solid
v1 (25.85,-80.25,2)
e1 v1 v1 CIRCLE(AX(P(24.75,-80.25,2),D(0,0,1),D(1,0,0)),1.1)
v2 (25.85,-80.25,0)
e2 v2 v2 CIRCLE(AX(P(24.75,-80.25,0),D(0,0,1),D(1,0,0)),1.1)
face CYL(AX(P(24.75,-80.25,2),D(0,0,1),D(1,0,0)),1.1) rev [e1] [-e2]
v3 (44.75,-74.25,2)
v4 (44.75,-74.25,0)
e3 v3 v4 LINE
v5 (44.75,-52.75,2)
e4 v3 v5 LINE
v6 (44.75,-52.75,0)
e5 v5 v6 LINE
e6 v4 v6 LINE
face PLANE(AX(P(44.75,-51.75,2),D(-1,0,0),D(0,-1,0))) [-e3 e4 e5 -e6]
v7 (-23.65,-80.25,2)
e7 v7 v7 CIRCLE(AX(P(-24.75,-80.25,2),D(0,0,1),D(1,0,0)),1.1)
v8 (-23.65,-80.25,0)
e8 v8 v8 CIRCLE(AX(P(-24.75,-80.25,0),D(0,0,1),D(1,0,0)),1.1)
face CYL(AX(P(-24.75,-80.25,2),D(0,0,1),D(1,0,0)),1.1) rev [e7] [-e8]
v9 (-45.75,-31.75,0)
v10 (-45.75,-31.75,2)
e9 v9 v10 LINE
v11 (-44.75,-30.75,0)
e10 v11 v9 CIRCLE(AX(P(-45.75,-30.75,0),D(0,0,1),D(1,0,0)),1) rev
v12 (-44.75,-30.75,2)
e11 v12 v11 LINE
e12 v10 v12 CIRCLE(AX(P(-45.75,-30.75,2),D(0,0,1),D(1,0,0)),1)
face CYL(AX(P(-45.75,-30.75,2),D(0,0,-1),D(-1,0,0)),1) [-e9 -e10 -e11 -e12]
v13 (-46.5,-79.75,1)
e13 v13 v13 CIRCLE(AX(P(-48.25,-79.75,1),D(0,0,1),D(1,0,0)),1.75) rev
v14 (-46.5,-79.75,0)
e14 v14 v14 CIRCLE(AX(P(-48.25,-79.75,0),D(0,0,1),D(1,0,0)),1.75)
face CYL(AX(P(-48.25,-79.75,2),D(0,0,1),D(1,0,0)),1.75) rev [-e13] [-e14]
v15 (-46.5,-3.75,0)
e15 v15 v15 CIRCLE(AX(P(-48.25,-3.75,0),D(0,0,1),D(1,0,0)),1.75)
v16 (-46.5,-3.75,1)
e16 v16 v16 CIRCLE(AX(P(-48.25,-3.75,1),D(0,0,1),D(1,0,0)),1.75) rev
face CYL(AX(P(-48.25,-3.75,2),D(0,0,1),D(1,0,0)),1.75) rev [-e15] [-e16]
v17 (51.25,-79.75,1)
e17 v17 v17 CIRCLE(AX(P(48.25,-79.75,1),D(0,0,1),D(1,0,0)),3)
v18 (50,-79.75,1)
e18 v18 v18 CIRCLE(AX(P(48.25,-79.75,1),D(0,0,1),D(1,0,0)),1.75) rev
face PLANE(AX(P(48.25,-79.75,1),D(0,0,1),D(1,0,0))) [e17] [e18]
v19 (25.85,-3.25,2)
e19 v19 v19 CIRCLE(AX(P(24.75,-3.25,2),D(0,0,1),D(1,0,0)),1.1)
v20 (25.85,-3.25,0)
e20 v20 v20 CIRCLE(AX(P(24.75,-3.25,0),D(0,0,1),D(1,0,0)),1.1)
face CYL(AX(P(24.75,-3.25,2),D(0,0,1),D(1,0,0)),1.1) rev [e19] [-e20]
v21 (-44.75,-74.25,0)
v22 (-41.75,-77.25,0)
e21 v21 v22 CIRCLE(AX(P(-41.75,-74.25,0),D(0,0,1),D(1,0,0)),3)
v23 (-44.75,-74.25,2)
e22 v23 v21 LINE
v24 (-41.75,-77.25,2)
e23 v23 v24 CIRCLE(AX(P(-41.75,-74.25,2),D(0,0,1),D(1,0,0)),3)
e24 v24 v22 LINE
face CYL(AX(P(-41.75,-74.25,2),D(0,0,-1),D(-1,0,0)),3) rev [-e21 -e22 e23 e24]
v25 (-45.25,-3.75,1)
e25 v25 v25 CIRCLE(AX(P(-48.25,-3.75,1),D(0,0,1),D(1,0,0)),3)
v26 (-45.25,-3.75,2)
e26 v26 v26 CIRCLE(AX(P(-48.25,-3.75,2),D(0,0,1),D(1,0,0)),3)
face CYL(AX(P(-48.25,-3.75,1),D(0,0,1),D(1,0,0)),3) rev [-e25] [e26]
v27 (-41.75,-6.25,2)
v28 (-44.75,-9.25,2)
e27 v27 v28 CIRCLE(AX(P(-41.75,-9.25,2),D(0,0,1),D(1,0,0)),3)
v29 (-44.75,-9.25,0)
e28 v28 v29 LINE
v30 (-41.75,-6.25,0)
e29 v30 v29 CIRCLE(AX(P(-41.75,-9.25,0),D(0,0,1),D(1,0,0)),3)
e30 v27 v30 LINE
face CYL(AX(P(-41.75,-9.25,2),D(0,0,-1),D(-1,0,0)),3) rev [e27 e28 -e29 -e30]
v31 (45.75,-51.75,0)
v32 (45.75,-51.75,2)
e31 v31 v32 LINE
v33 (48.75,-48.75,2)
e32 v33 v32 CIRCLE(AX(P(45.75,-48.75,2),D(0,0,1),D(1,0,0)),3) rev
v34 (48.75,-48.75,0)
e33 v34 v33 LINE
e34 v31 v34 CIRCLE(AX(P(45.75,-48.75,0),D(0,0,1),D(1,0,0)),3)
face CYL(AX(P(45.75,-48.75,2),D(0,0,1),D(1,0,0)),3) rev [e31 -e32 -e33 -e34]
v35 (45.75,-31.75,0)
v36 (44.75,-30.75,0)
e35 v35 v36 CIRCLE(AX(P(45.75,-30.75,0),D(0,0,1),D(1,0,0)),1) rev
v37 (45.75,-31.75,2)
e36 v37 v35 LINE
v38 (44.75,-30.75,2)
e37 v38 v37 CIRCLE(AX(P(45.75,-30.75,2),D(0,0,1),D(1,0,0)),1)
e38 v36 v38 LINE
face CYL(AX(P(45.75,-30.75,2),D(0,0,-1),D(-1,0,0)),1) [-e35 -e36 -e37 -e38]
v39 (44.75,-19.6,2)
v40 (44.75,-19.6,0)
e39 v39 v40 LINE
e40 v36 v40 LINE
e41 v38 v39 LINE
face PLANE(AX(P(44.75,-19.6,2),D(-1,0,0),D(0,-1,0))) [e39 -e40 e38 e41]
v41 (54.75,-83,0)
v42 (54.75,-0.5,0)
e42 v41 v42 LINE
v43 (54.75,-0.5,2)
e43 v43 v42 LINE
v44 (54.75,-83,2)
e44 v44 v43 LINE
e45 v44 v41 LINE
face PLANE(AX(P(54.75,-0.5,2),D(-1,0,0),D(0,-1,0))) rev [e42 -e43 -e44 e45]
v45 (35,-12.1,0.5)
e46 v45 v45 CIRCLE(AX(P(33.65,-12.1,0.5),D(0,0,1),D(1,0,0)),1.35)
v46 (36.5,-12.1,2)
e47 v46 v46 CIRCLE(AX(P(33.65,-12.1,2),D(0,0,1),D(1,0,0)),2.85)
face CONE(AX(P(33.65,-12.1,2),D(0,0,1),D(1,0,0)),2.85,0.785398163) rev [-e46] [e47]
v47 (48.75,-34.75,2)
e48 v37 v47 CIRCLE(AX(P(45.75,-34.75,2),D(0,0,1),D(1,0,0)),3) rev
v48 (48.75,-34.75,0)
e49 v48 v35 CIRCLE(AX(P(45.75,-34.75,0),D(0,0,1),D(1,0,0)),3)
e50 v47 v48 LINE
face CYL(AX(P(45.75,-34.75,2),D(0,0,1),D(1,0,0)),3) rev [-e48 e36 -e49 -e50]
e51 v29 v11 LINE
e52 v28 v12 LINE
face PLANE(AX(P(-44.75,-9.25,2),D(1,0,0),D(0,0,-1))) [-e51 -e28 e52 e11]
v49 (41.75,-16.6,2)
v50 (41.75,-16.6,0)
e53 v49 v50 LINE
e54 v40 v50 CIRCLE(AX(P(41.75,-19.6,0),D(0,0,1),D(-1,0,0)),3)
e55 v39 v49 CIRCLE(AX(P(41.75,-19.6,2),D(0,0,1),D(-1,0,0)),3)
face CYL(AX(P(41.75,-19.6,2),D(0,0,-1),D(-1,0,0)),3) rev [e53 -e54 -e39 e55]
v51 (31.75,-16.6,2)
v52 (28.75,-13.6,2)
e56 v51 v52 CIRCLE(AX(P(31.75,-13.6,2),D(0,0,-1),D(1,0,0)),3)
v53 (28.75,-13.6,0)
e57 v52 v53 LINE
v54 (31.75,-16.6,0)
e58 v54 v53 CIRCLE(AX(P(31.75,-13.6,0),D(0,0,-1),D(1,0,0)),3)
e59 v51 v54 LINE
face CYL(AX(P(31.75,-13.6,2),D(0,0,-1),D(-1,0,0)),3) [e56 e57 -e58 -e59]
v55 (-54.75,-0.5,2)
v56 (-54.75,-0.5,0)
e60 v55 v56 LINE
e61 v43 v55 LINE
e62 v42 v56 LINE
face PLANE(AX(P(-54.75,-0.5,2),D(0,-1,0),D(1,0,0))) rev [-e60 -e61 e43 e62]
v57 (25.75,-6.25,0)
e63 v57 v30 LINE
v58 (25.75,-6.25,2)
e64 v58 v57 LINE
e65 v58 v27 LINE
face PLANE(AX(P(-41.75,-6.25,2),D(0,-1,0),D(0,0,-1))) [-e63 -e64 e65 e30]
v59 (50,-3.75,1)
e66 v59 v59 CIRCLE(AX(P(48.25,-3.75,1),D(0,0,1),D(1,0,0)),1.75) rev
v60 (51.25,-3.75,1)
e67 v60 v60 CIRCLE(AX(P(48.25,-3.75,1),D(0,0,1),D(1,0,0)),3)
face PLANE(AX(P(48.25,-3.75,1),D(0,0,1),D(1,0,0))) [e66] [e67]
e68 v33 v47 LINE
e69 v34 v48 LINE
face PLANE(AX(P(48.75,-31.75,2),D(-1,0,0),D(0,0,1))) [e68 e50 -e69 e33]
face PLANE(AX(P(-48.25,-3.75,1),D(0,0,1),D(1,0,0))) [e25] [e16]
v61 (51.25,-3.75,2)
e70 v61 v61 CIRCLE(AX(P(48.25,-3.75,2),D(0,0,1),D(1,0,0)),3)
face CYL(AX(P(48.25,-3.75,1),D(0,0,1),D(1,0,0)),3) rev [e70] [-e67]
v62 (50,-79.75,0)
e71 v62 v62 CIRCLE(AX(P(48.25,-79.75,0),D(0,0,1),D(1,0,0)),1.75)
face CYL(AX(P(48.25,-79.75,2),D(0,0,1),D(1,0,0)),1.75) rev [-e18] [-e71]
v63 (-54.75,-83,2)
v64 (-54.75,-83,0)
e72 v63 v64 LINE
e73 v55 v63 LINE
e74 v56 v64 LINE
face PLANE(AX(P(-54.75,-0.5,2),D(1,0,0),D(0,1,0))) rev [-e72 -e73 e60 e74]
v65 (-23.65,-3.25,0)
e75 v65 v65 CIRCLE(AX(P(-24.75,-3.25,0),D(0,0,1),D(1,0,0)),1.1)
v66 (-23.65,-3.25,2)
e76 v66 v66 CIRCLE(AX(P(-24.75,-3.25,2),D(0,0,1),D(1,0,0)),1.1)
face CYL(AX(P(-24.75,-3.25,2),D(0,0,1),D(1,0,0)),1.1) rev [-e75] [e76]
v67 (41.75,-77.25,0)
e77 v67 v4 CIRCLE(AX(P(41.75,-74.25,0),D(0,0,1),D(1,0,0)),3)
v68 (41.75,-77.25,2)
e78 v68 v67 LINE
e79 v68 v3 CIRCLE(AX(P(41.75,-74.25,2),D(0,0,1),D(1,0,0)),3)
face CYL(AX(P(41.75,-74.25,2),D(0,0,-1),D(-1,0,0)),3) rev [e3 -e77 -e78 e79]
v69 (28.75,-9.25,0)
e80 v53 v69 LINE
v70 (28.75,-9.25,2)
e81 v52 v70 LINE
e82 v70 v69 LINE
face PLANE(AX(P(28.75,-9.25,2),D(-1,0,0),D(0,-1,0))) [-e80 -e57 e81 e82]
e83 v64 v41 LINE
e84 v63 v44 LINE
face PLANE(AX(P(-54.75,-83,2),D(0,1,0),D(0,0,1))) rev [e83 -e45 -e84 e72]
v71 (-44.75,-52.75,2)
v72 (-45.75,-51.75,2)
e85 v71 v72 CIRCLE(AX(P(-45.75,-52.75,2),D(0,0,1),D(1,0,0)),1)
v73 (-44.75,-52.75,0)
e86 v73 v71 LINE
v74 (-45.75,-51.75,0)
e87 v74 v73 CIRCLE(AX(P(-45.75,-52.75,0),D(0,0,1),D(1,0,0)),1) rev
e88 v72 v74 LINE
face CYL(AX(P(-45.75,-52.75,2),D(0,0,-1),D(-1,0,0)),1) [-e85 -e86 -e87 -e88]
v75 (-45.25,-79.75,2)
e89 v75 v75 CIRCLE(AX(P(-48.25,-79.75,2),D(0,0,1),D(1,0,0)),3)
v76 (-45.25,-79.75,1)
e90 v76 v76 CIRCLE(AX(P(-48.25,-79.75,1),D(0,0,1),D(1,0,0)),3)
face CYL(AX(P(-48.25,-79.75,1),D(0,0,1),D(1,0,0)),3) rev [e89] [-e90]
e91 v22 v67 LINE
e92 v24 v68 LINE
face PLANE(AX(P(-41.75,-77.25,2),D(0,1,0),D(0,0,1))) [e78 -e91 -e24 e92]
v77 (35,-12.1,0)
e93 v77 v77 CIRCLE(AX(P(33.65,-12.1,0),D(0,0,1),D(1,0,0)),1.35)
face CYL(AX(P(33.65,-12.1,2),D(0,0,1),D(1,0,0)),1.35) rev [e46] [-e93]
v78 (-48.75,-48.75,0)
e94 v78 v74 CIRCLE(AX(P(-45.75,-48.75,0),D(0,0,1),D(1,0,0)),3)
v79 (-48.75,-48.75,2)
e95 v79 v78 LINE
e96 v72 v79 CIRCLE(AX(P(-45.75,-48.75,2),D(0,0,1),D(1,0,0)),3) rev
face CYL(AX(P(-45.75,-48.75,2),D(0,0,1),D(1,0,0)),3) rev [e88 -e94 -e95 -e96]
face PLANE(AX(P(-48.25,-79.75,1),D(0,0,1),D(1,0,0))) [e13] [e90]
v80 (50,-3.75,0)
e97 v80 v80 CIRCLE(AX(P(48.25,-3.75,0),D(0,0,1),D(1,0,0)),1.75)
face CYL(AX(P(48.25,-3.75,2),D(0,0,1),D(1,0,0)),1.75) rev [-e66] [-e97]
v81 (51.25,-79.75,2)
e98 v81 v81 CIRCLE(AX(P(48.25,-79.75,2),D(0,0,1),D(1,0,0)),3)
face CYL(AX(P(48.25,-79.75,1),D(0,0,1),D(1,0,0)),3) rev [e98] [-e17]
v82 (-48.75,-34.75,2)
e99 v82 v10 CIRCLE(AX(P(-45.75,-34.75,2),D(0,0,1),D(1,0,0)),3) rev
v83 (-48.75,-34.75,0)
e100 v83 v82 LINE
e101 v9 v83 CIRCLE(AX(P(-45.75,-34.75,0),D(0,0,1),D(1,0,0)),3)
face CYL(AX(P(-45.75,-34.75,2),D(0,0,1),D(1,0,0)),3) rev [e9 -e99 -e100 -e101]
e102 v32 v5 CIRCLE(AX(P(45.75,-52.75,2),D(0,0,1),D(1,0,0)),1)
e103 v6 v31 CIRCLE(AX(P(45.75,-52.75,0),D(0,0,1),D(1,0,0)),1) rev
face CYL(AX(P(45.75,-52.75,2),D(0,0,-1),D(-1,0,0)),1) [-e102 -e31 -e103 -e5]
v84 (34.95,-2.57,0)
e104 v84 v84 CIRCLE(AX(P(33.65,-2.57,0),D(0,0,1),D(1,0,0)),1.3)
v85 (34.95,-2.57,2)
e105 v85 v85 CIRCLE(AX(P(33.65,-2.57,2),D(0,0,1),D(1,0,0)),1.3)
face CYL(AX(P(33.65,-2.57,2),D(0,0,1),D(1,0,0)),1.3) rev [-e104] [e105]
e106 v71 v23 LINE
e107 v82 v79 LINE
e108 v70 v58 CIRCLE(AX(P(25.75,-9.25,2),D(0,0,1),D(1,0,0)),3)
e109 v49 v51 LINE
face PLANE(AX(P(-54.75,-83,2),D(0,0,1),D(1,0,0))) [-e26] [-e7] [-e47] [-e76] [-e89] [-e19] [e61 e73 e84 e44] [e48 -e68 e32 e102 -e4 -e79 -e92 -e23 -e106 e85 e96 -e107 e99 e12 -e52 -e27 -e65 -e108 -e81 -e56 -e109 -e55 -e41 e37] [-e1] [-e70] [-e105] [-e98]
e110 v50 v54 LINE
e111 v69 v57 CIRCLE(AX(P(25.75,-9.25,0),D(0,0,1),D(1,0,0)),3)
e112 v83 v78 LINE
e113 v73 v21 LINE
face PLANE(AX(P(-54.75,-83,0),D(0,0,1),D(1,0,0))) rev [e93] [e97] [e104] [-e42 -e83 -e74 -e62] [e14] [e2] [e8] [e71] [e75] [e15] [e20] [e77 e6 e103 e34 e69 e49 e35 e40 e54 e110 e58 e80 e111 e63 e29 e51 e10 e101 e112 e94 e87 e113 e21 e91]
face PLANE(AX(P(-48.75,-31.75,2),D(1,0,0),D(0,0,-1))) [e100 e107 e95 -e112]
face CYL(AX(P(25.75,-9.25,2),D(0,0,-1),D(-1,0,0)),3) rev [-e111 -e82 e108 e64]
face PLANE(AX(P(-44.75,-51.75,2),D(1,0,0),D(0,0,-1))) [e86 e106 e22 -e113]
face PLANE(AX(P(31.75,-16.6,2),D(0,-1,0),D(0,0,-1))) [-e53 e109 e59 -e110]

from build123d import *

# Parameters (mm, degrees)
SKETCH1_W                  = 109.5
SKETCH1_H                  = 82.5
BOSS_EXTRUDE1_DEPTH        = 2
F_3_5_3_5_DIAMETER_HOLE1_D = 3.5
F_2_6_2_6_DIAMETER_HOLE1_D = 2.6
SKETCH9_R                  = 3
CUT_EXTRUDE1_DEPTH         = 1
F_2_2_2_2_DIAMETER_HOLE1_D = 2.2
FILLET1_R                  = 1
FILLET2_R                  = 3


with BuildPart() as part:
    # Sketch1 → Boss-Extrude1 (new body)
    with BuildSketch(Plane.XY):
        with Locations((0, -41.75)):
            Rectangle(SKETCH1_W, SKETCH1_H)
        with BuildLine():
            Line((28.75, -9.25), (28.75, -13.6))
            ThreePointArc((28.75, -13.6), (29.628679656, -15.721320344), (31.75, -16.6))
            Line((31.75, -16.6), (41.75, -16.6))
            ThreePointArc((41.75, -16.6), (43.871320344, -17.478679656), (44.75, -19.6))
            Line((44.75, -19.6), (44.75, -31.75))
            Line((44.75, -31.75), (48.75, -31.75))
            Line((48.75, -31.75), (48.75, -41.75))
            Line((48.75, -41.75), (48.75, -51.75))
            Line((48.75, -51.75), (44.75, -51.75))
            Line((44.75, -51.75), (44.75, -74.25))
            ThreePointArc((44.75, -74.25), (43.871320344, -76.371320344), (41.75, -77.25))
            Line((41.75, -77.25), (-41.75, -77.25))
            ThreePointArc((-41.75, -77.25), (-43.871320344, -76.371320344), (-44.75, -74.25))
            Line((-44.75, -74.25), (-44.75, -51.75))
            Line((-44.75, -51.75), (-48.75, -51.75))
            Line((-48.75, -51.75), (-48.75, -31.75))
            Line((-48.75, -31.75), (-44.75, -31.75))
            Line((-44.75, -31.75), (-44.75, -9.25))
            ThreePointArc((-44.75, -9.25), (-43.871320344, -7.128679656), (-41.75, -6.25))
            Line((-41.75, -6.25), (25.75, -6.25))
            ThreePointArc((25.75, -6.25), (27.871320344, -7.128679656), (28.75, -9.25))
        make_face(mode=Mode.SUBTRACT)
    extrude(amount=BOSS_EXTRUDE1_DEPTH)

    # Ø3.5 (3.5) Diameter Hole1 (through all)
    with Locations(Plane.XY.offset(2)):
        with Locations((-48.25, -3.75), (-48.25, -79.75), (48.25, -79.75), (48.25, -3.75)):
            Hole(F_3_5_3_5_DIAMETER_HOLE1_D / 2)

    # Sketch5 → CSK for M2.5 Flat Countersunk Head Screw1 (revolve, cut)
    with BuildSketch(Plane(origin=(33.65, -12.1, 2), x_dir=(0, -1, 0), z_dir=(1, 0, 0))):
        Polygon((0, 0), (0, 2), (1.35, 2), (1.35, 1.5), (2.85, 0), align=None)
    revolve(axis=Axis((33.65, -12.1, 8.35), (0, 0, -1)), mode=Mode.SUBTRACT)

    # Ø2.6 (2.6) Diameter Hole1 (through all)
    with Locations(Plane.XY.offset(2)):
        with Locations((33.65, -2.57)):
            Hole(F_2_6_2_6_DIAMETER_HOLE1_D / 2)

    # Sketch9 → Cut-Extrude1 (cut)
    with BuildSketch(Plane.XY.offset(2)):
        with Locations((-48.25, -3.75)):
            Circle(SKETCH9_R)
        with Locations((48.25, -3.75)):
            Circle(SKETCH9_R)
        with Locations((48.25, -79.75)):
            Circle(SKETCH9_R)
        with Locations((-48.25, -79.75)):
            Circle(SKETCH9_R)
    extrude(amount=-CUT_EXTRUDE1_DEPTH, mode=Mode.SUBTRACT)

    # Ø2.2 (2.2) Diameter Hole1 (through all)
    with Locations(Plane.XY.offset(2)):
        with Locations((-24.75, -3.25), (24.75, -3.25), (-24.75, -80.25), (24.75, -80.25)):
            Hole(F_2_2_2_2_DIAMETER_HOLE1_D / 2)

    # Fillet1
    fillet1_edges = [part.edges().sort_by_distance(p)[0] for p in [
        (-44.75, -31.75, 1),
        (-44.75, -51.75, 1),
        (44.75, -51.75, 1),
        (44.75, -31.75, 1),
    ]]
    fillet(fillet1_edges, radius=FILLET1_R)

    # Fillet2
    fillet2_edges = [part.edges().sort_by_distance(p)[0] for p in [
        (48.75, -31.75, 1),
        (48.75, -51.75, 1),
        (-48.75, -51.75, 1),
        (-48.75, -31.75, 1),
    ]]
    fillet(fillet2_edges, radius=FILLET2_R - 0.0001)  # a hair under: the kernel refuses the full size


solid = part.part
